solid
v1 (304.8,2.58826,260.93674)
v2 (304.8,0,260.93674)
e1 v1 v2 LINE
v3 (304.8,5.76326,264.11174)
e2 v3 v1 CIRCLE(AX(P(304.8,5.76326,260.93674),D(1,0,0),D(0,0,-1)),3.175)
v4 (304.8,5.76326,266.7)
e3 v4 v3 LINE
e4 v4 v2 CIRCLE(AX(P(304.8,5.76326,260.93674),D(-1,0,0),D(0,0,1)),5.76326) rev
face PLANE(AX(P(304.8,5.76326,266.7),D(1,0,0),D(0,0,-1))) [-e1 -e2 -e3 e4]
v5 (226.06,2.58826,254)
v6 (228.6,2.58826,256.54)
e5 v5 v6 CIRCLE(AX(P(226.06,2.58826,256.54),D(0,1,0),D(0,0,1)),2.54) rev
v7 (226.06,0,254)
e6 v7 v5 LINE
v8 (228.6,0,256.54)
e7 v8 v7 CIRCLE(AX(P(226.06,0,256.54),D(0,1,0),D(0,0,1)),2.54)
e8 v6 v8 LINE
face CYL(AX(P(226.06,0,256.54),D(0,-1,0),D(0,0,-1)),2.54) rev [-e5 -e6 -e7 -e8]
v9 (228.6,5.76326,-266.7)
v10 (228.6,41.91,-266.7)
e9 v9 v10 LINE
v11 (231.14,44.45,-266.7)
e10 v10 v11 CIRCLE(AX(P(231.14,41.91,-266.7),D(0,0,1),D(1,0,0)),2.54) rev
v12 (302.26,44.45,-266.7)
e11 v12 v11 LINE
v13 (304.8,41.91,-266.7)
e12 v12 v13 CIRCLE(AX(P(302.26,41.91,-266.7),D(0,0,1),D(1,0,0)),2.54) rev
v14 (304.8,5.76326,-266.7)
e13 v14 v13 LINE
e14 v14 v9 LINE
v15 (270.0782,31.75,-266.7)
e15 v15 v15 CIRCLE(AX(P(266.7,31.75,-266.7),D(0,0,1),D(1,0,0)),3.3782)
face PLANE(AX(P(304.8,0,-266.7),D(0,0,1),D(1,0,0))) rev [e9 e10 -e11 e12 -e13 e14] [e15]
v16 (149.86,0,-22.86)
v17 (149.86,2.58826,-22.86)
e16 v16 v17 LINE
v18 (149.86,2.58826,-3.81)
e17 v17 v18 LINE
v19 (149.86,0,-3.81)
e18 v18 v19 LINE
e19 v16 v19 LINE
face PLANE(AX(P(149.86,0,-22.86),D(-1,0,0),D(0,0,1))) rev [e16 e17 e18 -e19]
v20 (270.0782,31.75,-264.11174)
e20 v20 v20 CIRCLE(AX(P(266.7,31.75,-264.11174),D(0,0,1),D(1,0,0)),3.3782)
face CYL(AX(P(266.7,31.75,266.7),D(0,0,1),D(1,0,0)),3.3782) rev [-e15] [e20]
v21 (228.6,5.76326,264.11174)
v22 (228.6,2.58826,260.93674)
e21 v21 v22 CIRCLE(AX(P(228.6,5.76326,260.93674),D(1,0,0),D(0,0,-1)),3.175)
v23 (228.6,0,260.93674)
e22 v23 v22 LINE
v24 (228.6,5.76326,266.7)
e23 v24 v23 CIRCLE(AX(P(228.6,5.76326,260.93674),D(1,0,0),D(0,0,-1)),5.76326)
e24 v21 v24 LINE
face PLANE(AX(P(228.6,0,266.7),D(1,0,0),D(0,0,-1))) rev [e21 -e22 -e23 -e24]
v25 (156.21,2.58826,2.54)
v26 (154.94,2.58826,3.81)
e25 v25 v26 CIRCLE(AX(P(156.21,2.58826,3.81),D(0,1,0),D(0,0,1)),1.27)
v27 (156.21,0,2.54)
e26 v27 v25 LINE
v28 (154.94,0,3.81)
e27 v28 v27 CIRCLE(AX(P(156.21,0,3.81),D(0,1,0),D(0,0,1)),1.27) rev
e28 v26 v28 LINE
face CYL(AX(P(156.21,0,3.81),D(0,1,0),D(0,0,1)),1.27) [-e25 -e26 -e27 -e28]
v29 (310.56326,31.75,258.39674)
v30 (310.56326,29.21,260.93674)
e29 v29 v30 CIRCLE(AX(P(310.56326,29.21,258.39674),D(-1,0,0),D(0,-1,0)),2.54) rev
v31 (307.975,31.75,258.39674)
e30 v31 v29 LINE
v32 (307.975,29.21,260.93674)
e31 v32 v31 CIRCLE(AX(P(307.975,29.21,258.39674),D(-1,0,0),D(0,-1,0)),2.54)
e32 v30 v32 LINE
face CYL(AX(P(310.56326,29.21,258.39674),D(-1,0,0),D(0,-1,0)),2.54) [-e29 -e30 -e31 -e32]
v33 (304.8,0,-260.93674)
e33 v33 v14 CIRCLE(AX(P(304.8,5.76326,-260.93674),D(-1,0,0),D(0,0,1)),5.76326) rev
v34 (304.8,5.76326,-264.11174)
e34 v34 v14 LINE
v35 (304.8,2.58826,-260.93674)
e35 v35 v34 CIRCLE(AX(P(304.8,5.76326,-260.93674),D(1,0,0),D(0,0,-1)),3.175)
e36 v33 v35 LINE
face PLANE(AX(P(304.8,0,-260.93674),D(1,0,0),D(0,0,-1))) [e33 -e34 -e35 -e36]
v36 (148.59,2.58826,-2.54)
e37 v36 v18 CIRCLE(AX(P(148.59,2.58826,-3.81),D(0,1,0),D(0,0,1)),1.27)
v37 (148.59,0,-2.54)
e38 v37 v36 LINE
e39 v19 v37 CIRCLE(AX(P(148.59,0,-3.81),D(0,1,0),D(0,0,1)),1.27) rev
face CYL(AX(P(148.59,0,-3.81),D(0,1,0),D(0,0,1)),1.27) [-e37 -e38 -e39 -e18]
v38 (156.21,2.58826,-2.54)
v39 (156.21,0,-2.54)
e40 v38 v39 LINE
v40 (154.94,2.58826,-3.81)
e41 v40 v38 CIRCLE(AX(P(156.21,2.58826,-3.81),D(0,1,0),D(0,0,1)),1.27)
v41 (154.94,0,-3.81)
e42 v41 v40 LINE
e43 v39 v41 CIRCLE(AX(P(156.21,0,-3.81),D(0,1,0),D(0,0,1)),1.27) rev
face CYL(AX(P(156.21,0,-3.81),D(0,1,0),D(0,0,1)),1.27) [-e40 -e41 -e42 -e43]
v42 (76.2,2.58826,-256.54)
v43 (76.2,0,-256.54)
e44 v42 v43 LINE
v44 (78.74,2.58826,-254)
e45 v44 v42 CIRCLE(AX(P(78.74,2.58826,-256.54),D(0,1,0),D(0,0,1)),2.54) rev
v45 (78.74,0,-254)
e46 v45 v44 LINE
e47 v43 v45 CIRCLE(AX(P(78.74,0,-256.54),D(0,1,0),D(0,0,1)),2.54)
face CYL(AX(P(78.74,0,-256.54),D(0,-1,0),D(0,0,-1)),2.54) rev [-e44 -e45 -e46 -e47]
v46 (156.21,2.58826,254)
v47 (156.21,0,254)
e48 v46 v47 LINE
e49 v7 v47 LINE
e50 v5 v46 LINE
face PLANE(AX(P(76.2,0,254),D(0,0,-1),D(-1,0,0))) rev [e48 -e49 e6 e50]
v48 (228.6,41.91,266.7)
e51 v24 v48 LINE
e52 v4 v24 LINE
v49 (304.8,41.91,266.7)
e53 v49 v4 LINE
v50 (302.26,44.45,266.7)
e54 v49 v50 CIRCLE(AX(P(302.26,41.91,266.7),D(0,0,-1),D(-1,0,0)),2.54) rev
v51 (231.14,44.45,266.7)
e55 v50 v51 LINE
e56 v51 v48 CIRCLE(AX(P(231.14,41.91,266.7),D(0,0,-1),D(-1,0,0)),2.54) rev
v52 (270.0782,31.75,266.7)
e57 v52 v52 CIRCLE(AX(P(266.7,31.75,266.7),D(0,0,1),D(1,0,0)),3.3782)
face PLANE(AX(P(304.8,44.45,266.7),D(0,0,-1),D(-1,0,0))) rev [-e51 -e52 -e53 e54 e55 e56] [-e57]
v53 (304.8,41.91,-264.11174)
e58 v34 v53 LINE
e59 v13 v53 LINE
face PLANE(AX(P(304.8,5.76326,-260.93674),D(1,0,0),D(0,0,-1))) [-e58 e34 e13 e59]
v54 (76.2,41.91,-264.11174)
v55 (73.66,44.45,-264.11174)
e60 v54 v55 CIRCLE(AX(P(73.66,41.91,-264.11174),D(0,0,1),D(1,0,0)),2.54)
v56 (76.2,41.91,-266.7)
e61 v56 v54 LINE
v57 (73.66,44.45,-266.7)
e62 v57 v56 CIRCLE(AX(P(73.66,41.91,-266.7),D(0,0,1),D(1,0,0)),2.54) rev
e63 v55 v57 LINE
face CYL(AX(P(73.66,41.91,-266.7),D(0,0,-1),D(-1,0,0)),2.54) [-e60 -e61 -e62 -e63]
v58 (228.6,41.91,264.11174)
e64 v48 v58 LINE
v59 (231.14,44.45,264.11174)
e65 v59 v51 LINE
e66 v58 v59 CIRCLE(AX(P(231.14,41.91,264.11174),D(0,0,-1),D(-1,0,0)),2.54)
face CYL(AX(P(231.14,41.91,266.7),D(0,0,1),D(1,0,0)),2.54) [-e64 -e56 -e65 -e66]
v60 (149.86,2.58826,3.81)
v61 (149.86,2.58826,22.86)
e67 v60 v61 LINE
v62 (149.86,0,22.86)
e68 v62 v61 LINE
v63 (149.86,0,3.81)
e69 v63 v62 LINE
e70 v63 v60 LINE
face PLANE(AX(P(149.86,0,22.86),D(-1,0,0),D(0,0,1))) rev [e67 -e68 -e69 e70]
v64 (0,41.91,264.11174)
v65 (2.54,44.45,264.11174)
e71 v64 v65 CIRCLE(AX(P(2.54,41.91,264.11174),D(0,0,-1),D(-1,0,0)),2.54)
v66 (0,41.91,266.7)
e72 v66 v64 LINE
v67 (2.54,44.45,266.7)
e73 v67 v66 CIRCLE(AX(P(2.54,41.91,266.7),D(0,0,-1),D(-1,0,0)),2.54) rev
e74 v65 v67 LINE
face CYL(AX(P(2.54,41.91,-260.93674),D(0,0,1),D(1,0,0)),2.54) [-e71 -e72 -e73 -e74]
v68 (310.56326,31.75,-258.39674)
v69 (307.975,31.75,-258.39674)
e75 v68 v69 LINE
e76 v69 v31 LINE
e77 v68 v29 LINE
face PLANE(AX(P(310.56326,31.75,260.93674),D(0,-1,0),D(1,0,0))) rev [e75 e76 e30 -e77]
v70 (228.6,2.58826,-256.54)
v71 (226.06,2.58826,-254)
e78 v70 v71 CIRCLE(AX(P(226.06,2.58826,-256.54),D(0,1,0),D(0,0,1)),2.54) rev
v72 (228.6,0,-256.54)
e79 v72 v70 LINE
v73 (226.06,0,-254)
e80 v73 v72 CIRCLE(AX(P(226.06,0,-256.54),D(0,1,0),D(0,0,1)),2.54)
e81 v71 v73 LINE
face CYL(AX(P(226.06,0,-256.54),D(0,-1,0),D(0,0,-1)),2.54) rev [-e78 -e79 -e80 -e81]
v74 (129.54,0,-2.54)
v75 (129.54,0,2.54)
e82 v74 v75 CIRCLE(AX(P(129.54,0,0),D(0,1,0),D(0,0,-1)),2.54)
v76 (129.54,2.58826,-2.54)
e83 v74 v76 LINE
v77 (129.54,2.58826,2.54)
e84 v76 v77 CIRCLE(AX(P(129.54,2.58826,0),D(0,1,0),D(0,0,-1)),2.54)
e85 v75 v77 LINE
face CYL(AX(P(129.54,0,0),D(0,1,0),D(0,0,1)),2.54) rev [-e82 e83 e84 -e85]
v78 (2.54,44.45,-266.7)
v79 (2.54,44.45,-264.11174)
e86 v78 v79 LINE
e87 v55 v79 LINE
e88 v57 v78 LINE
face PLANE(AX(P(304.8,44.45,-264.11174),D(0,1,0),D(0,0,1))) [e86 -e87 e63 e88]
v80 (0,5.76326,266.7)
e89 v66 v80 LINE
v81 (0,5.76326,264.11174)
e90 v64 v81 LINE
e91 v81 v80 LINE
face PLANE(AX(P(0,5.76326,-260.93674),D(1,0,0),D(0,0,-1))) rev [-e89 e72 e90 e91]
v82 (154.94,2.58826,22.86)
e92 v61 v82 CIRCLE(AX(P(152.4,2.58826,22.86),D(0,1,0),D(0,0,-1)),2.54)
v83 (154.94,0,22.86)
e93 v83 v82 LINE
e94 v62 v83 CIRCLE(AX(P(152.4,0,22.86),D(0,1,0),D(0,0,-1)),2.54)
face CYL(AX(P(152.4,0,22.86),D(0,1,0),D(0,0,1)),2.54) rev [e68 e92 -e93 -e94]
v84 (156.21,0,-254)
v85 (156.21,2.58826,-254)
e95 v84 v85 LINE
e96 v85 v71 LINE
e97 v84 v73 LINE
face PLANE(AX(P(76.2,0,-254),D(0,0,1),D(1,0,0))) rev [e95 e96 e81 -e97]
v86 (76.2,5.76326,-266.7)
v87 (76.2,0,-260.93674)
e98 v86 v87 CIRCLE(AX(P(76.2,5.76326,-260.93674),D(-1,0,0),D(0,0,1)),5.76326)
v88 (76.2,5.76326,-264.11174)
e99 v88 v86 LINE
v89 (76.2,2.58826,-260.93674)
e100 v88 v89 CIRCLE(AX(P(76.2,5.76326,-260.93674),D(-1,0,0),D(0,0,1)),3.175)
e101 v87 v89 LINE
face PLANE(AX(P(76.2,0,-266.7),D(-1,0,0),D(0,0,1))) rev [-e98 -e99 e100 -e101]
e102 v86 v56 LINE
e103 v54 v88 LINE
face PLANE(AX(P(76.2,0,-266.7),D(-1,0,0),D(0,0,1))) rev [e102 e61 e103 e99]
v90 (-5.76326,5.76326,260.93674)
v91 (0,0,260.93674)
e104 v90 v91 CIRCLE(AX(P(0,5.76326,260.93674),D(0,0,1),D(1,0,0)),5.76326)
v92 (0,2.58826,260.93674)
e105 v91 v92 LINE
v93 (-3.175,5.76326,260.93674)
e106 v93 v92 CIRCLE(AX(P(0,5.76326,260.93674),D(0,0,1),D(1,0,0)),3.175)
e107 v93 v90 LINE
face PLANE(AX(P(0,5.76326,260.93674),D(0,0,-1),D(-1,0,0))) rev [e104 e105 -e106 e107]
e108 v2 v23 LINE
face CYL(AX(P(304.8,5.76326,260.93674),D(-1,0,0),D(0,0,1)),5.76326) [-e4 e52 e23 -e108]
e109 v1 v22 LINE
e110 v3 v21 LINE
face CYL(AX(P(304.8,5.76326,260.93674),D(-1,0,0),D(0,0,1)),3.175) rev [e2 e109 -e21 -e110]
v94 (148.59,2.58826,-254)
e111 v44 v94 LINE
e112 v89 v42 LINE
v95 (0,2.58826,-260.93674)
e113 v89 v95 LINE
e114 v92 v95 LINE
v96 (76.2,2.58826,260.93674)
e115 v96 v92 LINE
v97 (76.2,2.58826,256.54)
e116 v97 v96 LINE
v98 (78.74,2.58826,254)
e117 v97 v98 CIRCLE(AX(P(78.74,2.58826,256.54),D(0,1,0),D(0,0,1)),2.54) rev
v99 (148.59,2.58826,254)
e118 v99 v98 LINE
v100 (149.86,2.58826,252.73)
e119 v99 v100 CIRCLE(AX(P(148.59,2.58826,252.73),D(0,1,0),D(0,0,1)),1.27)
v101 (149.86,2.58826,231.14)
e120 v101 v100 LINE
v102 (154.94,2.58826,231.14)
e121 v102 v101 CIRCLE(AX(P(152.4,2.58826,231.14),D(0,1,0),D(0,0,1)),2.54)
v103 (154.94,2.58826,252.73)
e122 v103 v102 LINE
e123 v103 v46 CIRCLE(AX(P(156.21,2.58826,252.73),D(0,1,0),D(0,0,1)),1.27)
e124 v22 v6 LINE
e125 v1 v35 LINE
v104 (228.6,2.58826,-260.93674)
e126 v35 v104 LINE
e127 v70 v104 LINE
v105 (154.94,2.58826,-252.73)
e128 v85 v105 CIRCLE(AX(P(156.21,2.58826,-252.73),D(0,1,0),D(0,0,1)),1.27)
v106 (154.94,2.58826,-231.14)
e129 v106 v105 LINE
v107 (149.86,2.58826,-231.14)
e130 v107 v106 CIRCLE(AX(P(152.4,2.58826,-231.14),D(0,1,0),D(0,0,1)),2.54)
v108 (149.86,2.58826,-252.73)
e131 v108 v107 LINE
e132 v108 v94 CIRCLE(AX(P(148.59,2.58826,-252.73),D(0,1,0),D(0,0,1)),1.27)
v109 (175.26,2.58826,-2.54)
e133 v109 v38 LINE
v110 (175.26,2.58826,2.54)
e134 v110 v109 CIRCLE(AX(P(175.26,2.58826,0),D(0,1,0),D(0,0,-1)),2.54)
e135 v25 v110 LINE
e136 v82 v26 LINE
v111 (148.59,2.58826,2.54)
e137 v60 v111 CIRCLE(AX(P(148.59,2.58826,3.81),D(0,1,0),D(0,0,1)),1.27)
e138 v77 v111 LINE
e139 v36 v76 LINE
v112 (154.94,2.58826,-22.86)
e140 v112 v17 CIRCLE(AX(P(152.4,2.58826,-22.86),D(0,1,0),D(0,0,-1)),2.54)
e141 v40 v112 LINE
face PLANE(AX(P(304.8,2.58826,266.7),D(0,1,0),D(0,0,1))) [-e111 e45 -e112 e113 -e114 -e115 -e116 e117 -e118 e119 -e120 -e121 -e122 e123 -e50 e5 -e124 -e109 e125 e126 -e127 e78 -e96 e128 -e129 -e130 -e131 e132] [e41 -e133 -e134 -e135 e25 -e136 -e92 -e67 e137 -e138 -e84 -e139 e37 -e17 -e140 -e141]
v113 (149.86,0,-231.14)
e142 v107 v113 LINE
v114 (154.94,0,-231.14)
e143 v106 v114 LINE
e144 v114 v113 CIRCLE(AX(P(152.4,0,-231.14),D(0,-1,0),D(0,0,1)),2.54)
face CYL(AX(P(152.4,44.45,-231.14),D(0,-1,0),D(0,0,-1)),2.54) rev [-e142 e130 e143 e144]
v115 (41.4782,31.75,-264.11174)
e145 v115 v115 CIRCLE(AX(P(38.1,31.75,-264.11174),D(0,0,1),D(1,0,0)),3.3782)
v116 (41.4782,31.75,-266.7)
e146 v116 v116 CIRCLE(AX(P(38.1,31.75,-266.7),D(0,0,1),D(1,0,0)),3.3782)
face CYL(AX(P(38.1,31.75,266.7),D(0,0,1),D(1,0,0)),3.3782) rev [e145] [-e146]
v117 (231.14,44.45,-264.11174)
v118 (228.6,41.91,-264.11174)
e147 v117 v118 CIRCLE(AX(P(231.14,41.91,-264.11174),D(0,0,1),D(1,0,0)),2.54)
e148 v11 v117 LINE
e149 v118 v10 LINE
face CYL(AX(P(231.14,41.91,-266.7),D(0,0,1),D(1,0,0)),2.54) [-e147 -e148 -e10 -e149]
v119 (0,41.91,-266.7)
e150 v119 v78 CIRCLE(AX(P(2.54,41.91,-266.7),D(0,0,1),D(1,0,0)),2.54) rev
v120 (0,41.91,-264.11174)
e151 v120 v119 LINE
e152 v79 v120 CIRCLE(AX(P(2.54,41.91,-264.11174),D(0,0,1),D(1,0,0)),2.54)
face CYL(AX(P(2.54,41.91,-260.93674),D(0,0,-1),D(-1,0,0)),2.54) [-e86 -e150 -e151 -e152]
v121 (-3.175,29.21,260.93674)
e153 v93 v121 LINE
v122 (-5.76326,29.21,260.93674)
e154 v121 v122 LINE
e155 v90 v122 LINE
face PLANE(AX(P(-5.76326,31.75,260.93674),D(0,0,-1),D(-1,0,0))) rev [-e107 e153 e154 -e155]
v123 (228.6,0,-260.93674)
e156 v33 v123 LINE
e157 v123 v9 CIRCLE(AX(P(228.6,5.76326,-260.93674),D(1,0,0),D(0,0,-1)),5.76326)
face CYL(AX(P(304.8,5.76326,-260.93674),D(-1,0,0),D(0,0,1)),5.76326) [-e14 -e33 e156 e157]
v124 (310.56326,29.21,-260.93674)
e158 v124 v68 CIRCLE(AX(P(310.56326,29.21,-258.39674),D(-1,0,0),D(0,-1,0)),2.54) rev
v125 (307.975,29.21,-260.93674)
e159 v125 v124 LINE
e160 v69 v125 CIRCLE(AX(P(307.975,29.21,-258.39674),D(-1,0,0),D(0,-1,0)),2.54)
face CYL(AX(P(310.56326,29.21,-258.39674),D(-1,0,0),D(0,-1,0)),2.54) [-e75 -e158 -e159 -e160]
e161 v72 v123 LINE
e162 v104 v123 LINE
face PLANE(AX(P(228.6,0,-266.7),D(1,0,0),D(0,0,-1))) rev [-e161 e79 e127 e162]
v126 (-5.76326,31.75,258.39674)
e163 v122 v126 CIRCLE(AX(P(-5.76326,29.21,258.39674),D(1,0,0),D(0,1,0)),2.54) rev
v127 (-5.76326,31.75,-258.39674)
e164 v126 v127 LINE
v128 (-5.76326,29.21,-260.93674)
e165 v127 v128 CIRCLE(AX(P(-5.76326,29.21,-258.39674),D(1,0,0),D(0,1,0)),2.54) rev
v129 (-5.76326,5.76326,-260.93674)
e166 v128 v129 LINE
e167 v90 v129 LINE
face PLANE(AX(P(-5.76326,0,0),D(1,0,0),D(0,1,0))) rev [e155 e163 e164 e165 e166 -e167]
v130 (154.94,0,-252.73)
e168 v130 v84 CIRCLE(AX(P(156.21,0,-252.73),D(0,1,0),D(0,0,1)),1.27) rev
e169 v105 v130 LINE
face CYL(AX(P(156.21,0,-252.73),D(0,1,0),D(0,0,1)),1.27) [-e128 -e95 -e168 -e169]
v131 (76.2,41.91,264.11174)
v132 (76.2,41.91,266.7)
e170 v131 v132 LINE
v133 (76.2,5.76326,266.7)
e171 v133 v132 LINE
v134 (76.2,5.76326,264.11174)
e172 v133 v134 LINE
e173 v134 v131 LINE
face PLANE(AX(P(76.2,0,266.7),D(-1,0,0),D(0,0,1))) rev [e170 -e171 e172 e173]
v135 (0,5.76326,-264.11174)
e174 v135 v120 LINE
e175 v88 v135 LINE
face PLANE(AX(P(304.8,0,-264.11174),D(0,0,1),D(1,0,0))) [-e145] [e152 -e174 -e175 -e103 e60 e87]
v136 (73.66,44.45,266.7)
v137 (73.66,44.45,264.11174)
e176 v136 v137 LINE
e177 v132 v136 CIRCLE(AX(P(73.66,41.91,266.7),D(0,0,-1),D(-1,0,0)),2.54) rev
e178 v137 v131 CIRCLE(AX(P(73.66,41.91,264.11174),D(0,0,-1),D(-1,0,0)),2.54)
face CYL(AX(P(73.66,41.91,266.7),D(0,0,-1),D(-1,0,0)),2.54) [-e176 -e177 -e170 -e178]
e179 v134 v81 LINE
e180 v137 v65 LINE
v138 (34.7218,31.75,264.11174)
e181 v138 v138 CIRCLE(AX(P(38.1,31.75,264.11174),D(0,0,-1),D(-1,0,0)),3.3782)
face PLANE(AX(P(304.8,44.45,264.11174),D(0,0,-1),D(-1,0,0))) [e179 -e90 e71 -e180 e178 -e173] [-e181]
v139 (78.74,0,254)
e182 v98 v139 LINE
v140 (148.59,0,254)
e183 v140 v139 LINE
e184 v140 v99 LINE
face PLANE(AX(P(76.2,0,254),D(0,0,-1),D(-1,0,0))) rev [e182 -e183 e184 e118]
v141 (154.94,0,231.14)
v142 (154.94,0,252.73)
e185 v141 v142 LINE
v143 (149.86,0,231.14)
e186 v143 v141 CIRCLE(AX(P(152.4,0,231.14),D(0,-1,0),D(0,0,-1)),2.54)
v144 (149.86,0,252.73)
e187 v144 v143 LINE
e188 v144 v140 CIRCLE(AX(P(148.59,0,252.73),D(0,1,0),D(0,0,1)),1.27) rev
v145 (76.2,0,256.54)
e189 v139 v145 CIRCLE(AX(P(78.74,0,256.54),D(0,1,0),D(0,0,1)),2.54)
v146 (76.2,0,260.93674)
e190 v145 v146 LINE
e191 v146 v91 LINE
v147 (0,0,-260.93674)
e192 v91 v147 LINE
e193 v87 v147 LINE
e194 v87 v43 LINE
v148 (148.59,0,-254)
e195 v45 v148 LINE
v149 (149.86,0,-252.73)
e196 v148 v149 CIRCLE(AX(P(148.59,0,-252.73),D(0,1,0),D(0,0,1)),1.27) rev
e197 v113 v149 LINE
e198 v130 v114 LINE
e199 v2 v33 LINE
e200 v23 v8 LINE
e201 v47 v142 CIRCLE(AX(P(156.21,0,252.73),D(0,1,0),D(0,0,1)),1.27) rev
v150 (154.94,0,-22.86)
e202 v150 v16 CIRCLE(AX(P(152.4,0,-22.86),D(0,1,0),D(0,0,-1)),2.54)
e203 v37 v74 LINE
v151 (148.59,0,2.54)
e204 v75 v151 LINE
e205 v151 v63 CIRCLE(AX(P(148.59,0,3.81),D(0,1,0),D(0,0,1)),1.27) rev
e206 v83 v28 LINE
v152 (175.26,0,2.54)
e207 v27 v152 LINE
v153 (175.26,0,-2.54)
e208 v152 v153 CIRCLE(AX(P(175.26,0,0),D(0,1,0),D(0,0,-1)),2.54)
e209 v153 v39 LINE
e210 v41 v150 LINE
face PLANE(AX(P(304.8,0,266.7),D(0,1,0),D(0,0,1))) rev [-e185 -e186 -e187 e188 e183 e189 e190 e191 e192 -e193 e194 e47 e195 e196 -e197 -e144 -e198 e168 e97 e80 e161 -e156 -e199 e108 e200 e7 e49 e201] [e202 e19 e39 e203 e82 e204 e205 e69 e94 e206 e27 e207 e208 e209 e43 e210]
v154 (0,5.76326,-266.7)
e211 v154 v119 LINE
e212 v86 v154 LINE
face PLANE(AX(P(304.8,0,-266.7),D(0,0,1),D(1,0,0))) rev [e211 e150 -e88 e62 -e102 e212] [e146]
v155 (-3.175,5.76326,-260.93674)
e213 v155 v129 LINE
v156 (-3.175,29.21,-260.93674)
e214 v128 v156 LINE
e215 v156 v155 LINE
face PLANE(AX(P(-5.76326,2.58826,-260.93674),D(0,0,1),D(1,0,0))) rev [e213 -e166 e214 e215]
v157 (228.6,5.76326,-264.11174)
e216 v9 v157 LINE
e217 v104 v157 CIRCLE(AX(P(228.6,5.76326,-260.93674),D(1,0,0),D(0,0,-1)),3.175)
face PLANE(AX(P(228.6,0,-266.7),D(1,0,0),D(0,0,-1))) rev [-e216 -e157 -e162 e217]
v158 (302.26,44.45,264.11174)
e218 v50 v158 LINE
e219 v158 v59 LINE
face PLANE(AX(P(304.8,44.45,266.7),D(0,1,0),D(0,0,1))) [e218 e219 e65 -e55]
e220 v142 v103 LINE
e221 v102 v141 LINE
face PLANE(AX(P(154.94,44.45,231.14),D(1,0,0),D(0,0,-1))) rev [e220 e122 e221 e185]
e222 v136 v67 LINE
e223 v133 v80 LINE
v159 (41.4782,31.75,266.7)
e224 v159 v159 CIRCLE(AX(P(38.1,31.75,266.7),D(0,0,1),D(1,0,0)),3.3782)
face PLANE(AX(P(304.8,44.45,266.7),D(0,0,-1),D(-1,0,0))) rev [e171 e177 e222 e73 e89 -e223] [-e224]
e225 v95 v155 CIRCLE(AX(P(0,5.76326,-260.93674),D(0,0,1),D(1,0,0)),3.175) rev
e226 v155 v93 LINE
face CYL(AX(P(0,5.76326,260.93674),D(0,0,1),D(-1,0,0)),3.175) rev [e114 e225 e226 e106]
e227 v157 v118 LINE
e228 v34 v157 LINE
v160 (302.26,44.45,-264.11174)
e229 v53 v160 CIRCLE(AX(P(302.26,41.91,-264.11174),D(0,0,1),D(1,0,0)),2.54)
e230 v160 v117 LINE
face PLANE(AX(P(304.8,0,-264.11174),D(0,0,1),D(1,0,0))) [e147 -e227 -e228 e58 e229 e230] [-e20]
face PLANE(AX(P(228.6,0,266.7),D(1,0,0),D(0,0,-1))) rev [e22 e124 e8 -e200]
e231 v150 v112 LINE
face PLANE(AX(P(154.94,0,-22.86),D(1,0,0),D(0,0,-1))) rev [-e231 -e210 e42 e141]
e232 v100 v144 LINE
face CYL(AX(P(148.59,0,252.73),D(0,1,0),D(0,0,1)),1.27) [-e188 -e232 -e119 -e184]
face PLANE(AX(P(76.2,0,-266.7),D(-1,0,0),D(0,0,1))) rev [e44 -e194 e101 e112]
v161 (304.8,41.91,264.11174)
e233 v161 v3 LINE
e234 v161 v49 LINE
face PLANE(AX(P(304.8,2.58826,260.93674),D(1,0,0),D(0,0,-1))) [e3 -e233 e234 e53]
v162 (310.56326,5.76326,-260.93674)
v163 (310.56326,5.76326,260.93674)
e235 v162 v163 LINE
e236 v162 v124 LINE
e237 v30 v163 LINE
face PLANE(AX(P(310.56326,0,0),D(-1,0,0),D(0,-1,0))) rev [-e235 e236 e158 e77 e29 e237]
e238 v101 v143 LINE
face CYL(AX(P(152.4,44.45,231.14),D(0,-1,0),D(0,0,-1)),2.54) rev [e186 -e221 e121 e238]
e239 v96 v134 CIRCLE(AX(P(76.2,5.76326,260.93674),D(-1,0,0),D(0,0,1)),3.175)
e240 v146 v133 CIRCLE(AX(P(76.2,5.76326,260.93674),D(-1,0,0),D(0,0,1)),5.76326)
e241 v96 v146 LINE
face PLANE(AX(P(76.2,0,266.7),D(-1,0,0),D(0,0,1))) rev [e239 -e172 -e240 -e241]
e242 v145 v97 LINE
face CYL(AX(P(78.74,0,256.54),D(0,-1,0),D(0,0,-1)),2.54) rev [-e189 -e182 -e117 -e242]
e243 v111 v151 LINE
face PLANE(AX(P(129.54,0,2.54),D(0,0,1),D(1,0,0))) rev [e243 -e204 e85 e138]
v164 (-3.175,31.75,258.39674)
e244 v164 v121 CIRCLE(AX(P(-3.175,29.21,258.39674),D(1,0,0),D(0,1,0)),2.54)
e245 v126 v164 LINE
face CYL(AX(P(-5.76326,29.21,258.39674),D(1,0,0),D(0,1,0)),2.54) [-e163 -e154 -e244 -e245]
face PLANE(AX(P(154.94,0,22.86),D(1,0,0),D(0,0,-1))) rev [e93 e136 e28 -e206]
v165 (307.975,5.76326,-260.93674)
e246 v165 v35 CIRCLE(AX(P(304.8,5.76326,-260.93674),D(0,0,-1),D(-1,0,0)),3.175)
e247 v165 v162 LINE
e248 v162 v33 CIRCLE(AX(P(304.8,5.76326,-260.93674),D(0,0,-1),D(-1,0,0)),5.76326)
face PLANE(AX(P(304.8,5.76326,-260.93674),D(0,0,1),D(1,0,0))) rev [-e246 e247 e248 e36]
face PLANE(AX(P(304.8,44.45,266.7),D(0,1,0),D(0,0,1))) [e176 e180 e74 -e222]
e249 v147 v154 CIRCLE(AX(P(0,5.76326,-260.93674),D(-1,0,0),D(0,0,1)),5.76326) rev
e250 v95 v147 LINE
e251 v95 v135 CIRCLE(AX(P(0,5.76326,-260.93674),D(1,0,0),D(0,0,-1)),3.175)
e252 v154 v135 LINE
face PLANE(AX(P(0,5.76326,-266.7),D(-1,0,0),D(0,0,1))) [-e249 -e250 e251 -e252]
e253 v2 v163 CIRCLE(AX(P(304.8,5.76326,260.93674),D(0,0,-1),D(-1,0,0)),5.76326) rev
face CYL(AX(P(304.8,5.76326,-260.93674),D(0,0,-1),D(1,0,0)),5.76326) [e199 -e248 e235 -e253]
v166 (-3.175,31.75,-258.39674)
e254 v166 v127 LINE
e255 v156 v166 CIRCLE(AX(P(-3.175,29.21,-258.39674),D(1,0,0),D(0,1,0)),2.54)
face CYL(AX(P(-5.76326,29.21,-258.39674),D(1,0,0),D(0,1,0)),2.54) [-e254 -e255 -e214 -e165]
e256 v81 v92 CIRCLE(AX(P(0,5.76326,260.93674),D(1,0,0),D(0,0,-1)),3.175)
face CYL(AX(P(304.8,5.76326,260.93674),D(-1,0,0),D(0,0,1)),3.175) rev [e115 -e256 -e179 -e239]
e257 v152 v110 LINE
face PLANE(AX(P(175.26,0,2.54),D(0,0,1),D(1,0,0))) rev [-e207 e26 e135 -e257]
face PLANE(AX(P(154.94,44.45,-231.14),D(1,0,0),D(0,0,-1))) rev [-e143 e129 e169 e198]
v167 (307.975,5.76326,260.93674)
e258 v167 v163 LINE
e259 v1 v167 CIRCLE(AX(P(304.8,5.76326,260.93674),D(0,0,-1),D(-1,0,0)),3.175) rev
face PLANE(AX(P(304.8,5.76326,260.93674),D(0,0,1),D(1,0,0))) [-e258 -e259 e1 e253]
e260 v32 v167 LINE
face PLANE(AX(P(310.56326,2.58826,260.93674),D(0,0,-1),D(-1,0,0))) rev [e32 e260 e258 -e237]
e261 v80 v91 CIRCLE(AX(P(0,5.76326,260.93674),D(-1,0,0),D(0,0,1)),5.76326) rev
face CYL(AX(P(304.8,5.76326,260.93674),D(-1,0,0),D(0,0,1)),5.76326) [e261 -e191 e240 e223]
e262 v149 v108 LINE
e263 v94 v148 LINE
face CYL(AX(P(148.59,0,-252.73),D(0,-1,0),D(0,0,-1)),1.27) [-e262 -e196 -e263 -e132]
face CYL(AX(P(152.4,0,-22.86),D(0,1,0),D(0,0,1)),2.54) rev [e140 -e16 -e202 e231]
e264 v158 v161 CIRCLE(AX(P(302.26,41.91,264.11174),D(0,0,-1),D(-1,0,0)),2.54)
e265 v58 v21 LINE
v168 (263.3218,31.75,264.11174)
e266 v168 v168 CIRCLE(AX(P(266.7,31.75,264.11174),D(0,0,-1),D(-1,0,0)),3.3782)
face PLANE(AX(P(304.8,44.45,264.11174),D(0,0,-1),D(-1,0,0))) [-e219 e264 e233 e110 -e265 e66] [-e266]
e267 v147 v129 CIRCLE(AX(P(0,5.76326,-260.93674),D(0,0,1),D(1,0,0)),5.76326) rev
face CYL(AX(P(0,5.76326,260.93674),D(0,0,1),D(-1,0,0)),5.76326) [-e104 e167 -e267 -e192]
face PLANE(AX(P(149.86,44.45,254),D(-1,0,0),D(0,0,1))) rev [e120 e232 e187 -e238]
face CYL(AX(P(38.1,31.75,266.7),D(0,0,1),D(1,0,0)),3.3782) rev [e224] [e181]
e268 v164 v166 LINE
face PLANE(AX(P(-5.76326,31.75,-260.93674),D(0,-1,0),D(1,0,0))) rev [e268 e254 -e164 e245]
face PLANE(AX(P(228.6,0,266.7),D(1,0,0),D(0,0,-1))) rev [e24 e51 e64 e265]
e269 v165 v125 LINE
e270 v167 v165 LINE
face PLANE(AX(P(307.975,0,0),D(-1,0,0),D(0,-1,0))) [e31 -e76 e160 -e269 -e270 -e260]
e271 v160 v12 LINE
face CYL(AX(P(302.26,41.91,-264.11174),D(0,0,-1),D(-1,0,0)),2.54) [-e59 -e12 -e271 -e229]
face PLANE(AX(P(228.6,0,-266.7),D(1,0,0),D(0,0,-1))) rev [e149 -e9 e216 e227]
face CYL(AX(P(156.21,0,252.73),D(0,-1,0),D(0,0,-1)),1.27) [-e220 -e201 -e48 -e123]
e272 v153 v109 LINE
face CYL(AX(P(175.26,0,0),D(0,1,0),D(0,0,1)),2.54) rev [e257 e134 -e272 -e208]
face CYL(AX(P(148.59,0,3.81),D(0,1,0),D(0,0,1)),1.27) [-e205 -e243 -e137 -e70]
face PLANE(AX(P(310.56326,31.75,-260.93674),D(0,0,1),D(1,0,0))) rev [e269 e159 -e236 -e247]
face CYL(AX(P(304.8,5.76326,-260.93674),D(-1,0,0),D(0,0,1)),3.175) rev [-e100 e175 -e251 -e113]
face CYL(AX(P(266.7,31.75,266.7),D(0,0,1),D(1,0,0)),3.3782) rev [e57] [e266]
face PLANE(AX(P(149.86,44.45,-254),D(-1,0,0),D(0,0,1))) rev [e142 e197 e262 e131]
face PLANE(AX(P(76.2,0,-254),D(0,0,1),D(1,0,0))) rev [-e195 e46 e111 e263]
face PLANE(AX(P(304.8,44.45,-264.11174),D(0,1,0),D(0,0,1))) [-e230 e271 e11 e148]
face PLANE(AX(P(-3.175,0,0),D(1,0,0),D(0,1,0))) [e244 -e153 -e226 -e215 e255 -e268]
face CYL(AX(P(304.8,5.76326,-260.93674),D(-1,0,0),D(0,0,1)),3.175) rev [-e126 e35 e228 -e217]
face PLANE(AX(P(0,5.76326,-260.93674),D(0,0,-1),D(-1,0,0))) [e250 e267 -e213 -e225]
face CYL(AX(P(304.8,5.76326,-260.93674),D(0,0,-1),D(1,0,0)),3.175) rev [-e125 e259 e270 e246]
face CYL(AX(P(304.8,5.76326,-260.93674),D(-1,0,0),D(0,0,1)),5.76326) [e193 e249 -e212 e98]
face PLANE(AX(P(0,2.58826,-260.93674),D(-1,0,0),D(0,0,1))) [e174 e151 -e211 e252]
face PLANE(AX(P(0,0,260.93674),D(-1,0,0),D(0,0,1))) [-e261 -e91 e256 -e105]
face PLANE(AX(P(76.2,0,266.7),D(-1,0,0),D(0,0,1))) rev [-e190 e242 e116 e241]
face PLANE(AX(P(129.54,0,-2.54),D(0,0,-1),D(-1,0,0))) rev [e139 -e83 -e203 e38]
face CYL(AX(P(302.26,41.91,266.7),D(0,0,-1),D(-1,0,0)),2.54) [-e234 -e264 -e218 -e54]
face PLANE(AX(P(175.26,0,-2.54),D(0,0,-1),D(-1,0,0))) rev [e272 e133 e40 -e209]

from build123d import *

# Parameters (mm, degrees)
BASE_FLANGE1_DEPTH      = 304.8
CUT_EXTRUDE1_DEPTH      = 408.166225608
CUT_EXTRUDE1_DEPTH_BACK = 408.166225608
SKETCH6_W               = 152.4
SKETCH6_H               = 12.7
EDGE_FLANGE1_DEPTH      = 521.87348
EDGE_FLANGE1_BEND_DEPTH = 521.87348
F_1_4_CLEARANCE_HOLE1_D = 6.7564
FILLET1_R               = 2.54
CUT_EXTRUDE2_DEPTH      = 412.498279143
CUT_EXTRUDE3_DEPTH      = 412.769633365
FILLET2_R               = 1.27


# Sheet-metal steps are written as plain solids
with BuildPart() as part:
    # Sketch1 → Base-Flange1 (new body)
    with BuildSketch(Plane(origin=(0, 0, 0), x_dir=(0, 0, -1), z_dir=(1, 0, 0))):
        with BuildLine():
            Line((-266.7, 44.45), (-266.7, 5.76326))
            ThreePointArc((-266.7, 5.76326), (-265.011980228, 1.688019772), (-260.93674, 0))
            Line((-260.93674, 0), (260.93674, 0))
            ThreePointArc((260.93674, 0), (265.011980228, 1.688019772), (266.7, 5.76326))
            Line((266.7, 5.76326), (266.7, 44.45))
            Line((266.7, 44.45), (264.11174, 44.45))
            Line((264.11174, 44.45), (264.11174, 5.76326))
            ThreePointArc((264.11174, 5.76326), (263.18180403, 3.51819597), (260.93674, 2.58826))
            Line((260.93674, 2.58826), (-260.93674, 2.58826))
            ThreePointArc((-260.93674, 2.58826), (-263.18180403, 3.51819597), (-264.11174, 5.76326))
            Line((-264.11174, 5.76326), (-264.11174, 44.45))
            Line((-264.11174, 44.45), (-266.7, 44.45))
        make_face()
    extrude(amount=BASE_FLANGE1_DEPTH)

    # Sketch6 → Cut-Extrude1 (cut, two sides: drawn at the far end of the back side and taken through both)
    with BuildSketch(Plane(origin=(0, 2.58826, 0), x_dir=(1, 0, 0), z_dir=(0, 1, 0)).offset(-CUT_EXTRUDE1_DEPTH_BACK)):
        with Locations((152.4, 260.35)):
            Rectangle(SKETCH6_W, SKETCH6_H)
        with Locations((152.4, -260.35)):
            Rectangle(SKETCH6_W, SKETCH6_H)
    extrude(amount=CUT_EXTRUDE1_DEPTH + CUT_EXTRUDE1_DEPTH_BACK, mode=Mode.SUBTRACT)

    # Edge-Flange1 section (across the edge) → Edge-Flange1 (add)
    with BuildSketch(Plane(origin=(-3.175, 2.58826, -260.93674), x_dir=(1, 0, 0), z_dir=(0, 0, 1))):
        with BuildLine():
            Line((-2.58826, 3.175), (-2.58826, 29.16174))
            Line((-2.58826, 29.16174), (0, 29.16174))
            Line((0, 29.16174), (0, 3.175))
            ThreePointArc((0, 3.175), (0.92993597, 0.92993597), (3.175, 0))
            Line((3.175, 0), (3.175, -2.58826))
            ThreePointArc((3.175, -2.58826), (-0.900240228, -0.900240228), (-2.58826, 3.175))
        make_face()
    extrude(amount=EDGE_FLANGE1_DEPTH)

    # Edge-Flange1 section 2 (across the edge) → Edge-Flange1 bend (add)
    with BuildSketch(Plane(origin=(307.975, 2.58826, 260.93674), x_dir=(-1, 0, 0), z_dir=(0, 0, -1))):
        with BuildLine():
            Line((-2.58826, 3.175), (-2.58826, 29.16174))
            Line((-2.58826, 29.16174), (0, 29.16174))
            Line((0, 29.16174), (0, 3.175))
            ThreePointArc((0, 3.175), (0.92993597, 0.92993597), (3.175, 0))
            Line((3.175, 0), (3.175, -2.58826))
            ThreePointArc((3.175, -2.58826), (-0.900240228, -0.900240228), (-2.58826, 3.175))
        make_face()
    extrude(amount=EDGE_FLANGE1_BEND_DEPTH)

    # 1/4 Clearance Hole1 (through all)
    with Locations(Plane.XY.offset(266.7)):
        with Locations((38.1, 31.75), (266.7, 31.75)):
            Hole(F_1_4_CLEARANCE_HOLE1_D / 2)

    # Fillet1
    fillet1_edges = [part.edges().sort_by_distance(p)[0] for p in [
        (0, 44.45, 265.40587),
        (-4.46913, 31.75, -260.93674),
        (-4.46913, 31.75, 260.93674),
        (0, 44.45, -265.40587),
        (309.26913, 31.75, 260.93674),
        (309.26913, 31.75, -260.93674),
        (304.8, 44.45, 265.40587),
        (76.2, 1.29413, -254),
        (228.6, 1.29413, -254),
        (228.6, 44.45, -265.40587),
        (76.2, 44.45, -265.40587),
        (304.8, 44.45, -265.40587),
        (228.6, 1.29413, 254),
        (76.2, 1.29413, 254),
        (76.2, 44.45, 265.40587),
        (228.6, 44.45, 265.40587),
    ]]
    fillet(fillet1_edges, radius=FILLET1_R)

    # Sketch15 → Cut-Extrude2 (cut, through all)
    with BuildSketch(Plane(origin=(0, 2.58826, 0), x_dir=(1, 0, 0), z_dir=(0, 1, 0))):
        with BuildLine():
            Line((149.86, 22.86), (149.86, 2.54))
            Line((149.86, 2.54), (129.54, 2.54))
            ThreePointArc((129.54, 2.54), (127, 0), (129.54, -2.54))
            Line((129.54, -2.54), (149.86, -2.54))
            Line((149.86, -2.54), (149.86, -22.86))
            ThreePointArc((149.86, -22.86), (152.4, -25.4), (154.94, -22.86))
            Line((154.94, -22.86), (154.94, -2.54))
            Line((154.94, -2.54), (175.26, -2.54))
            ThreePointArc((175.26, -2.54), (177.8, 0), (175.26, 2.54))
            Line((175.26, 2.54), (154.94, 2.54))
            Line((154.94, 2.54), (154.94, 22.86))
            ThreePointArc((154.94, 22.86), (152.4, 25.4), (149.86, 22.86))
        make_face()
    extrude(amount=-CUT_EXTRUDE2_DEPTH, mode=Mode.SUBTRACT)

    # Sketch16 → Cut-Extrude3 (cut, through all)
    with BuildSketch(Plane.XZ):
        with BuildLine():
            Line((149.86, -254), (149.86, -231.14))
            ThreePointArc((149.86, -231.14), (152.4, -228.6), (154.94, -231.14))
            Line((154.94, -231.14), (154.94, -254))
            Line((154.94, -254), (149.86, -254))
        make_face()
        with BuildLine():
            Line((154.94, 254), (149.86, 254))
            Line((149.86, 254), (149.86, 231.14))
            ThreePointArc((149.86, 231.14), (152.4, 228.6), (154.94, 231.14))
            Line((154.94, 231.14), (154.94, 254))
        make_face()
    extrude(amount=-CUT_EXTRUDE3_DEPTH, mode=Mode.SUBTRACT)

    # Fillet2
    fillet2_edges = [part.edges().sort_by_distance(p)[0] for p in [
        (149.86, 1.29413, -2.54),
        (154.94, 1.29413, -2.54),
        (154.94, 1.29413, 2.54),
        (149.86, 1.29413, 2.54),
        (154.94, 1.29413, 254),
        (149.86, 1.29413, 254),
        (154.94, 1.29413, -254),
        (149.86, 1.29413, -254),
    ]]
    fillet(fillet2_edges, radius=FILLET2_R)


solid = part.part
